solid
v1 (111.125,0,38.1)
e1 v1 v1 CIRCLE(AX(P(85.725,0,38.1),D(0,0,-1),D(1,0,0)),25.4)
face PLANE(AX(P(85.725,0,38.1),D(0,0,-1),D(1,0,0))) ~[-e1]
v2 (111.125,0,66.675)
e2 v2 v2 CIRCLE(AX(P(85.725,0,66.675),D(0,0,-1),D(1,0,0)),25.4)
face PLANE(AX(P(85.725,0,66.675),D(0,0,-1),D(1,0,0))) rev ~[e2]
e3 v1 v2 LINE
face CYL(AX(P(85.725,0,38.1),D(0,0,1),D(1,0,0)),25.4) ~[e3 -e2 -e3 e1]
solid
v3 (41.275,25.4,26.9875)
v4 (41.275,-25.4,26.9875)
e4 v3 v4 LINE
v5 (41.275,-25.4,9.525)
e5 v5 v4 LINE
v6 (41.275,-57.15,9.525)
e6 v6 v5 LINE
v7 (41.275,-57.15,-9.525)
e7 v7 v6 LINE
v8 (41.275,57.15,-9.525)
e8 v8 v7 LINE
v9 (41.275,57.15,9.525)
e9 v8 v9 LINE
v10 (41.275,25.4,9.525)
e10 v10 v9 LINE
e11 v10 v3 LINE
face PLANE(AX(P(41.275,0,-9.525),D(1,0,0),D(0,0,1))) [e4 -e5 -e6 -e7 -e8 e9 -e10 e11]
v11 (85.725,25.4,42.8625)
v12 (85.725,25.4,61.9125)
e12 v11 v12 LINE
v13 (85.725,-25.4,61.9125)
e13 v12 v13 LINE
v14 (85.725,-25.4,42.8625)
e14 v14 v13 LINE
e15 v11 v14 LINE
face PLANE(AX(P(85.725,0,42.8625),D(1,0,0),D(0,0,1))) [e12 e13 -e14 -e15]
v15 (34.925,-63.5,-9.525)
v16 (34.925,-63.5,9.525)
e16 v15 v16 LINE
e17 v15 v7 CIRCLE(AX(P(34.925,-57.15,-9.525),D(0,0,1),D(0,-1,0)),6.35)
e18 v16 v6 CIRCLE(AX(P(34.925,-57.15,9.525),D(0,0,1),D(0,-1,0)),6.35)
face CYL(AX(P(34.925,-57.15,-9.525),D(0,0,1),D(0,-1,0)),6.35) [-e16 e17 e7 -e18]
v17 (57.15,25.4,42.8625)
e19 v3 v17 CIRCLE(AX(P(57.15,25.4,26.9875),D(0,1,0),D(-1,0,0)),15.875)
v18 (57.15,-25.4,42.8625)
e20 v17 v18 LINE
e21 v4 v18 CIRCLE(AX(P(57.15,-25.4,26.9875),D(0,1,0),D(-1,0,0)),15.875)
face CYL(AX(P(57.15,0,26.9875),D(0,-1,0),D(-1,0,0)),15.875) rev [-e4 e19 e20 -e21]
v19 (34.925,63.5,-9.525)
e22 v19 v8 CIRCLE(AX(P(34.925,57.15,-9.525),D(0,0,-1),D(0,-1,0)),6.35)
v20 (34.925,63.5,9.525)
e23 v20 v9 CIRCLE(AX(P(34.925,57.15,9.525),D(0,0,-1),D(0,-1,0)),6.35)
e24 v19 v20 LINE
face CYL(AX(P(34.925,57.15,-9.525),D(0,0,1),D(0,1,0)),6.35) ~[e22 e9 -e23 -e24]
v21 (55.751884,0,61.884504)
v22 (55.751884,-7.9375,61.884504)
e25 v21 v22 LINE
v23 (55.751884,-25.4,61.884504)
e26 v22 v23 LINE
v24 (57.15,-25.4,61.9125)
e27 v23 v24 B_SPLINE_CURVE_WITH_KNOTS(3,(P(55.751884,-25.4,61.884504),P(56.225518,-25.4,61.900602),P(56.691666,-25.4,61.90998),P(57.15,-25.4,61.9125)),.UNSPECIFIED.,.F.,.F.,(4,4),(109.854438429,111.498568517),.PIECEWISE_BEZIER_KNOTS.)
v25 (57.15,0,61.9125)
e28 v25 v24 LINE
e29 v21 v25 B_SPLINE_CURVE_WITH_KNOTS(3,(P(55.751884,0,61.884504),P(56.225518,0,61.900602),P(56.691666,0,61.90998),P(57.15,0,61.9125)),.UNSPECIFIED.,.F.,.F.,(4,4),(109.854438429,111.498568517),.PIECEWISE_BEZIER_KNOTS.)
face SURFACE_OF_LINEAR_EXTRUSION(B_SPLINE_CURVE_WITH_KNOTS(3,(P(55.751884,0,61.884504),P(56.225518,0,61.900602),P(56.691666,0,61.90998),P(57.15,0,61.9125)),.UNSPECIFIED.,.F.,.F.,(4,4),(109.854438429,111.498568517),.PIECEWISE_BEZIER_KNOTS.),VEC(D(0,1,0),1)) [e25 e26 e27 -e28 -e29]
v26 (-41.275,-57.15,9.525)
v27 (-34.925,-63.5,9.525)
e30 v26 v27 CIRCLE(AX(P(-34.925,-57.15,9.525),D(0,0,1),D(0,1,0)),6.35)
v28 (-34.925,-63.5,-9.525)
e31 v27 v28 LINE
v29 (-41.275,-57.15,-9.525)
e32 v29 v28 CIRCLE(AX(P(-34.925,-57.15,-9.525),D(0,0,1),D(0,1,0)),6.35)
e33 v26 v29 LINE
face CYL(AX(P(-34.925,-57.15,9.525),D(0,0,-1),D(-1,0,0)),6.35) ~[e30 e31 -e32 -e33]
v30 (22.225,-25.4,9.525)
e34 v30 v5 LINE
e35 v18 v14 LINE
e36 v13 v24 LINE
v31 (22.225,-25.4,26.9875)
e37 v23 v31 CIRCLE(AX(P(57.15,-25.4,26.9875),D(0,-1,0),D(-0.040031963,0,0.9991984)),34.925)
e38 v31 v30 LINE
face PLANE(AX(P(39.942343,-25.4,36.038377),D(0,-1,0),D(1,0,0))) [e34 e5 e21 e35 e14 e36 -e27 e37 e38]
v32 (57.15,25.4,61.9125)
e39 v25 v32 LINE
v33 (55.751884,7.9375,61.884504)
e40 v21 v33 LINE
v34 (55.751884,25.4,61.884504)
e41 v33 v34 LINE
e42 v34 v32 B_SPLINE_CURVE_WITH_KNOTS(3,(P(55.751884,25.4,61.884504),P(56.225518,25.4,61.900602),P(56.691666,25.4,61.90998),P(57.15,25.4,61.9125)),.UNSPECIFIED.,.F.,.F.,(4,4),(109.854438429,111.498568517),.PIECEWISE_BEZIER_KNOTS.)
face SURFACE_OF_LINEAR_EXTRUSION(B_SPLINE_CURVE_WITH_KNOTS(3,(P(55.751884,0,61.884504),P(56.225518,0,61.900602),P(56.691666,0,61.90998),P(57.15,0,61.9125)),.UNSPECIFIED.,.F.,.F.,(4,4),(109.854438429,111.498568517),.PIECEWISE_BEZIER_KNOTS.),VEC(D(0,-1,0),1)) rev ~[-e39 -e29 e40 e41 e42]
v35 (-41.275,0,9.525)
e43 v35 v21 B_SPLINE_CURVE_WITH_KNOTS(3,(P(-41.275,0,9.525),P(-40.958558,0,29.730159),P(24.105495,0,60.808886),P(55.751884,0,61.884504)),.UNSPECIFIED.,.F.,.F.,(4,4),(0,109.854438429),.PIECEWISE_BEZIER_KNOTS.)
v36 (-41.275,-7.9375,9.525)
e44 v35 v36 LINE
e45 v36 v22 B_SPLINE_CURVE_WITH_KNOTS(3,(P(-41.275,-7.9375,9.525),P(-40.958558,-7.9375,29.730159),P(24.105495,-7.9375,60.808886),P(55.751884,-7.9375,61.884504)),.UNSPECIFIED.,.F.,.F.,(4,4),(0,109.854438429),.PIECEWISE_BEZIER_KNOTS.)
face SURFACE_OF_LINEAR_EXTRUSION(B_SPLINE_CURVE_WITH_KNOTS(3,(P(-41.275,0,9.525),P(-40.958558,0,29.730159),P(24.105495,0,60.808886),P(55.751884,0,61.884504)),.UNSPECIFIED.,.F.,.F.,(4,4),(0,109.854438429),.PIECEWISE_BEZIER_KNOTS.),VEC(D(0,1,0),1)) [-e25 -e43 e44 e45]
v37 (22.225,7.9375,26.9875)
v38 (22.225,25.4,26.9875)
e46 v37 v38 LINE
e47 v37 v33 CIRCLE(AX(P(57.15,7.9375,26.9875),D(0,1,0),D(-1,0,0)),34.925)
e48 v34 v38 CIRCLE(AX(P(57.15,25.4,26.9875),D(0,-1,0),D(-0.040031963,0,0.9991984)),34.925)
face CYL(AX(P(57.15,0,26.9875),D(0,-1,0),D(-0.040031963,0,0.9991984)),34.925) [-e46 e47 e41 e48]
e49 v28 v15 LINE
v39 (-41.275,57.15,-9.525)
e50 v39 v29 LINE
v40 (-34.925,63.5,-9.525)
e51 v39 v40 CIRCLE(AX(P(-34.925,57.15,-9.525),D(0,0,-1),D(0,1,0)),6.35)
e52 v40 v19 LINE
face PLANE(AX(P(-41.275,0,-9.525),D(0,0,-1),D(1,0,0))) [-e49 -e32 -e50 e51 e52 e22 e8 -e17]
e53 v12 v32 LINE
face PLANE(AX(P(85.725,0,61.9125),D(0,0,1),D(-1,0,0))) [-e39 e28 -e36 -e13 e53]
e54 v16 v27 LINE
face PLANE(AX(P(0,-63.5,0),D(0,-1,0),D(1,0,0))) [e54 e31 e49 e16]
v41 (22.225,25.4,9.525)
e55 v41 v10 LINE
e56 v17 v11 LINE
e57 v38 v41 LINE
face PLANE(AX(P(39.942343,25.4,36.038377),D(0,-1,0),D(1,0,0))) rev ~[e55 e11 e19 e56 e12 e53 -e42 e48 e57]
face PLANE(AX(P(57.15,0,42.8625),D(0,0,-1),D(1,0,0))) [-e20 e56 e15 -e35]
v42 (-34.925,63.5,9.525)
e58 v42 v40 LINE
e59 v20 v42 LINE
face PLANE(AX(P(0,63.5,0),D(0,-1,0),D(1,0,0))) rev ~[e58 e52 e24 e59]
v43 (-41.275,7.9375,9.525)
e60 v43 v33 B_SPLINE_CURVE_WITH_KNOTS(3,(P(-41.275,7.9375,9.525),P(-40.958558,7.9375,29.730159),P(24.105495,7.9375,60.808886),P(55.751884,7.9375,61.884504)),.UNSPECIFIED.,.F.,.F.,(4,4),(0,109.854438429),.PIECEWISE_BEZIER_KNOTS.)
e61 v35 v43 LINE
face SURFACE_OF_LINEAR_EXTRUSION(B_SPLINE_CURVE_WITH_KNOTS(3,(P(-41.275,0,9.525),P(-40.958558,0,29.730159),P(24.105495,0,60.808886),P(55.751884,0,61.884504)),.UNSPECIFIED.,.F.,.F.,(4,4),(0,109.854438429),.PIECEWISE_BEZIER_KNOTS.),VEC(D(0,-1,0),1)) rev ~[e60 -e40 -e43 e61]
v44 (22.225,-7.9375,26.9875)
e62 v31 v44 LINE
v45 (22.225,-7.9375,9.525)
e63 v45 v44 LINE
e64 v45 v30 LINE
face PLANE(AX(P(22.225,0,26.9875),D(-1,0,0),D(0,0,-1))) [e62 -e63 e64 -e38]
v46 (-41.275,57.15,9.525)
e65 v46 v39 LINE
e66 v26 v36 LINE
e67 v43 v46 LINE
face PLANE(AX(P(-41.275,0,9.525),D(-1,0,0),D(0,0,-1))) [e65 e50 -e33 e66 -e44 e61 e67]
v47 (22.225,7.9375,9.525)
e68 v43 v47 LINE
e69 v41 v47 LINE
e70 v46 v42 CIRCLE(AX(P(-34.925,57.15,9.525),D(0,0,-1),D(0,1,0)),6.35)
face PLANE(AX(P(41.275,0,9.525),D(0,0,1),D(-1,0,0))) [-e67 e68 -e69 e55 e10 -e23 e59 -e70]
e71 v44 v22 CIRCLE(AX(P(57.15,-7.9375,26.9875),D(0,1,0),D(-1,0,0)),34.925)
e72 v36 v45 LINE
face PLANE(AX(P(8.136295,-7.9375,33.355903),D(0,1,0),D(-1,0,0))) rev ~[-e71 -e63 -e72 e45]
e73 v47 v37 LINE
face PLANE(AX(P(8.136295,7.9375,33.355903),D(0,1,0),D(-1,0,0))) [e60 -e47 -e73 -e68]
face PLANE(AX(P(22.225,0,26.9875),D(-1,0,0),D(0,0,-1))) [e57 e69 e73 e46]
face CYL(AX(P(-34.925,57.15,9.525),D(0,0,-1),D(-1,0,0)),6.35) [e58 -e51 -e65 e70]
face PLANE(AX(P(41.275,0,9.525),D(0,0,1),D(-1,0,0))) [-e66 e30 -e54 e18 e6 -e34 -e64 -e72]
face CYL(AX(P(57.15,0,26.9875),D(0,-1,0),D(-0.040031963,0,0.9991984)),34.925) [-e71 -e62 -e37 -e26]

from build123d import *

# Parameters (mm, degrees)
F1_DEPTH = 63.5
F0_W     = 25.4
F0_H     = 19.05
F2_DEPTH = 25.4
F3_DEPTH = 7.9375
F5_R     = 6.35


# Not quite as in the source:
# - a feature names something its author has since deleted; it is built from what else it names


with BuildPart() as f1:
    # F0 (on Front) → F1 (new body, symmetric)
    with BuildSketch(Plane.XZ):
        Polygon((22.225, 9.525), (-41.275, 9.525), (-41.275, -9.525), (41.275, -9.525), (41.275, 9.525), align=None)
    extrude(amount=F1_DEPTH, both=True)

    # F0 (on Front) → F2 (join, symmetric)
    with BuildSketch(Plane.XZ):
        with BuildLine():
            Line((22.225, 26.9875), (22.225, 9.525))
            Line((22.225, 9.525), (41.275, 9.525))
            Line((41.275, 9.525), (41.275, 26.9875))
            ThreePointArc((41.275, 26.9875), (45.9246798487, 38.2128201513), (57.15, 42.8625))
            Line((57.15, 42.8625), (60.325, 42.8625))
            Line((60.325, 42.8625), (60.325, 61.9125))
            Line((60.325, 61.9125), (57.15, 61.9125))
            add(Edge.make_bspline(
                [(55.7518836795, 61.8845041086), (56.2255175188, 61.9006022789), (56.6916659887, 61.909979921), (57.15, 61.9125)],
                knots=[109.8544384291, 109.8544384291, 109.8544384291, 109.8544384291, 111.4985685166, 111.4985685166, 111.4985685166, 111.4985685166], degree=3))
            ThreePointArc((55.7518836795, 61.8845041086), (31.9648373293, 51.1838469609), (22.225, 26.9875))
        make_face()
        with Locations((73.025, 52.3875)):
            Rectangle(F0_W, F0_H)
    extrude(amount=F2_DEPTH, both=True)

    # F0 (on Front) → F3 (join, symmetric)
    with BuildSketch(Plane.XZ):
        with BuildLine():
            add(Edge.make_bspline(
                [(-41.275, 9.525), (-40.9585584382, 29.7301590249), (24.1054952085, 60.8088863876), (55.7518836795, 61.8845041086)],
                knots=[0, 0, 0, 0, 109.8544384291, 109.8544384291, 109.8544384291, 109.8544384291], degree=3))
            Line((-41.275, 9.525), (22.225, 9.525))
            Line((22.225, 9.525), (22.225, 26.9875))
            ThreePointArc((22.225, 26.9875), (31.9648373293, 51.1838469609), (55.7518836795, 61.8845041086))
        make_face()
    extrude(amount=F3_DEPTH, both=True)

    # F5
    f5_edges = [f1.edges().sort_by_distance(p)[0] for p in [
        (41.275, -63.5, 0),
        (-41.275, -63.5, 0),
        (41.275, 63.5, 0),
        (-41.275, 63.5, 0),
    ]]
    fillet(f5_edges, radius=F5_R)


with BuildPart() as f4:
    # F0 (on Front) → F4 (revolve)
    with BuildSketch(Plane.XZ):
        Polygon((85.725, 66.675), (85.725, 61.9125), (85.725, 42.8625), (85.725, 38.1), (111.125, 38.1), (111.125, 66.675), align=None)
    revolve(axis=Axis((85.725, 0, 52.3875), (0, 0, -1)))


solid = Compound([f1.part, f4.part])
